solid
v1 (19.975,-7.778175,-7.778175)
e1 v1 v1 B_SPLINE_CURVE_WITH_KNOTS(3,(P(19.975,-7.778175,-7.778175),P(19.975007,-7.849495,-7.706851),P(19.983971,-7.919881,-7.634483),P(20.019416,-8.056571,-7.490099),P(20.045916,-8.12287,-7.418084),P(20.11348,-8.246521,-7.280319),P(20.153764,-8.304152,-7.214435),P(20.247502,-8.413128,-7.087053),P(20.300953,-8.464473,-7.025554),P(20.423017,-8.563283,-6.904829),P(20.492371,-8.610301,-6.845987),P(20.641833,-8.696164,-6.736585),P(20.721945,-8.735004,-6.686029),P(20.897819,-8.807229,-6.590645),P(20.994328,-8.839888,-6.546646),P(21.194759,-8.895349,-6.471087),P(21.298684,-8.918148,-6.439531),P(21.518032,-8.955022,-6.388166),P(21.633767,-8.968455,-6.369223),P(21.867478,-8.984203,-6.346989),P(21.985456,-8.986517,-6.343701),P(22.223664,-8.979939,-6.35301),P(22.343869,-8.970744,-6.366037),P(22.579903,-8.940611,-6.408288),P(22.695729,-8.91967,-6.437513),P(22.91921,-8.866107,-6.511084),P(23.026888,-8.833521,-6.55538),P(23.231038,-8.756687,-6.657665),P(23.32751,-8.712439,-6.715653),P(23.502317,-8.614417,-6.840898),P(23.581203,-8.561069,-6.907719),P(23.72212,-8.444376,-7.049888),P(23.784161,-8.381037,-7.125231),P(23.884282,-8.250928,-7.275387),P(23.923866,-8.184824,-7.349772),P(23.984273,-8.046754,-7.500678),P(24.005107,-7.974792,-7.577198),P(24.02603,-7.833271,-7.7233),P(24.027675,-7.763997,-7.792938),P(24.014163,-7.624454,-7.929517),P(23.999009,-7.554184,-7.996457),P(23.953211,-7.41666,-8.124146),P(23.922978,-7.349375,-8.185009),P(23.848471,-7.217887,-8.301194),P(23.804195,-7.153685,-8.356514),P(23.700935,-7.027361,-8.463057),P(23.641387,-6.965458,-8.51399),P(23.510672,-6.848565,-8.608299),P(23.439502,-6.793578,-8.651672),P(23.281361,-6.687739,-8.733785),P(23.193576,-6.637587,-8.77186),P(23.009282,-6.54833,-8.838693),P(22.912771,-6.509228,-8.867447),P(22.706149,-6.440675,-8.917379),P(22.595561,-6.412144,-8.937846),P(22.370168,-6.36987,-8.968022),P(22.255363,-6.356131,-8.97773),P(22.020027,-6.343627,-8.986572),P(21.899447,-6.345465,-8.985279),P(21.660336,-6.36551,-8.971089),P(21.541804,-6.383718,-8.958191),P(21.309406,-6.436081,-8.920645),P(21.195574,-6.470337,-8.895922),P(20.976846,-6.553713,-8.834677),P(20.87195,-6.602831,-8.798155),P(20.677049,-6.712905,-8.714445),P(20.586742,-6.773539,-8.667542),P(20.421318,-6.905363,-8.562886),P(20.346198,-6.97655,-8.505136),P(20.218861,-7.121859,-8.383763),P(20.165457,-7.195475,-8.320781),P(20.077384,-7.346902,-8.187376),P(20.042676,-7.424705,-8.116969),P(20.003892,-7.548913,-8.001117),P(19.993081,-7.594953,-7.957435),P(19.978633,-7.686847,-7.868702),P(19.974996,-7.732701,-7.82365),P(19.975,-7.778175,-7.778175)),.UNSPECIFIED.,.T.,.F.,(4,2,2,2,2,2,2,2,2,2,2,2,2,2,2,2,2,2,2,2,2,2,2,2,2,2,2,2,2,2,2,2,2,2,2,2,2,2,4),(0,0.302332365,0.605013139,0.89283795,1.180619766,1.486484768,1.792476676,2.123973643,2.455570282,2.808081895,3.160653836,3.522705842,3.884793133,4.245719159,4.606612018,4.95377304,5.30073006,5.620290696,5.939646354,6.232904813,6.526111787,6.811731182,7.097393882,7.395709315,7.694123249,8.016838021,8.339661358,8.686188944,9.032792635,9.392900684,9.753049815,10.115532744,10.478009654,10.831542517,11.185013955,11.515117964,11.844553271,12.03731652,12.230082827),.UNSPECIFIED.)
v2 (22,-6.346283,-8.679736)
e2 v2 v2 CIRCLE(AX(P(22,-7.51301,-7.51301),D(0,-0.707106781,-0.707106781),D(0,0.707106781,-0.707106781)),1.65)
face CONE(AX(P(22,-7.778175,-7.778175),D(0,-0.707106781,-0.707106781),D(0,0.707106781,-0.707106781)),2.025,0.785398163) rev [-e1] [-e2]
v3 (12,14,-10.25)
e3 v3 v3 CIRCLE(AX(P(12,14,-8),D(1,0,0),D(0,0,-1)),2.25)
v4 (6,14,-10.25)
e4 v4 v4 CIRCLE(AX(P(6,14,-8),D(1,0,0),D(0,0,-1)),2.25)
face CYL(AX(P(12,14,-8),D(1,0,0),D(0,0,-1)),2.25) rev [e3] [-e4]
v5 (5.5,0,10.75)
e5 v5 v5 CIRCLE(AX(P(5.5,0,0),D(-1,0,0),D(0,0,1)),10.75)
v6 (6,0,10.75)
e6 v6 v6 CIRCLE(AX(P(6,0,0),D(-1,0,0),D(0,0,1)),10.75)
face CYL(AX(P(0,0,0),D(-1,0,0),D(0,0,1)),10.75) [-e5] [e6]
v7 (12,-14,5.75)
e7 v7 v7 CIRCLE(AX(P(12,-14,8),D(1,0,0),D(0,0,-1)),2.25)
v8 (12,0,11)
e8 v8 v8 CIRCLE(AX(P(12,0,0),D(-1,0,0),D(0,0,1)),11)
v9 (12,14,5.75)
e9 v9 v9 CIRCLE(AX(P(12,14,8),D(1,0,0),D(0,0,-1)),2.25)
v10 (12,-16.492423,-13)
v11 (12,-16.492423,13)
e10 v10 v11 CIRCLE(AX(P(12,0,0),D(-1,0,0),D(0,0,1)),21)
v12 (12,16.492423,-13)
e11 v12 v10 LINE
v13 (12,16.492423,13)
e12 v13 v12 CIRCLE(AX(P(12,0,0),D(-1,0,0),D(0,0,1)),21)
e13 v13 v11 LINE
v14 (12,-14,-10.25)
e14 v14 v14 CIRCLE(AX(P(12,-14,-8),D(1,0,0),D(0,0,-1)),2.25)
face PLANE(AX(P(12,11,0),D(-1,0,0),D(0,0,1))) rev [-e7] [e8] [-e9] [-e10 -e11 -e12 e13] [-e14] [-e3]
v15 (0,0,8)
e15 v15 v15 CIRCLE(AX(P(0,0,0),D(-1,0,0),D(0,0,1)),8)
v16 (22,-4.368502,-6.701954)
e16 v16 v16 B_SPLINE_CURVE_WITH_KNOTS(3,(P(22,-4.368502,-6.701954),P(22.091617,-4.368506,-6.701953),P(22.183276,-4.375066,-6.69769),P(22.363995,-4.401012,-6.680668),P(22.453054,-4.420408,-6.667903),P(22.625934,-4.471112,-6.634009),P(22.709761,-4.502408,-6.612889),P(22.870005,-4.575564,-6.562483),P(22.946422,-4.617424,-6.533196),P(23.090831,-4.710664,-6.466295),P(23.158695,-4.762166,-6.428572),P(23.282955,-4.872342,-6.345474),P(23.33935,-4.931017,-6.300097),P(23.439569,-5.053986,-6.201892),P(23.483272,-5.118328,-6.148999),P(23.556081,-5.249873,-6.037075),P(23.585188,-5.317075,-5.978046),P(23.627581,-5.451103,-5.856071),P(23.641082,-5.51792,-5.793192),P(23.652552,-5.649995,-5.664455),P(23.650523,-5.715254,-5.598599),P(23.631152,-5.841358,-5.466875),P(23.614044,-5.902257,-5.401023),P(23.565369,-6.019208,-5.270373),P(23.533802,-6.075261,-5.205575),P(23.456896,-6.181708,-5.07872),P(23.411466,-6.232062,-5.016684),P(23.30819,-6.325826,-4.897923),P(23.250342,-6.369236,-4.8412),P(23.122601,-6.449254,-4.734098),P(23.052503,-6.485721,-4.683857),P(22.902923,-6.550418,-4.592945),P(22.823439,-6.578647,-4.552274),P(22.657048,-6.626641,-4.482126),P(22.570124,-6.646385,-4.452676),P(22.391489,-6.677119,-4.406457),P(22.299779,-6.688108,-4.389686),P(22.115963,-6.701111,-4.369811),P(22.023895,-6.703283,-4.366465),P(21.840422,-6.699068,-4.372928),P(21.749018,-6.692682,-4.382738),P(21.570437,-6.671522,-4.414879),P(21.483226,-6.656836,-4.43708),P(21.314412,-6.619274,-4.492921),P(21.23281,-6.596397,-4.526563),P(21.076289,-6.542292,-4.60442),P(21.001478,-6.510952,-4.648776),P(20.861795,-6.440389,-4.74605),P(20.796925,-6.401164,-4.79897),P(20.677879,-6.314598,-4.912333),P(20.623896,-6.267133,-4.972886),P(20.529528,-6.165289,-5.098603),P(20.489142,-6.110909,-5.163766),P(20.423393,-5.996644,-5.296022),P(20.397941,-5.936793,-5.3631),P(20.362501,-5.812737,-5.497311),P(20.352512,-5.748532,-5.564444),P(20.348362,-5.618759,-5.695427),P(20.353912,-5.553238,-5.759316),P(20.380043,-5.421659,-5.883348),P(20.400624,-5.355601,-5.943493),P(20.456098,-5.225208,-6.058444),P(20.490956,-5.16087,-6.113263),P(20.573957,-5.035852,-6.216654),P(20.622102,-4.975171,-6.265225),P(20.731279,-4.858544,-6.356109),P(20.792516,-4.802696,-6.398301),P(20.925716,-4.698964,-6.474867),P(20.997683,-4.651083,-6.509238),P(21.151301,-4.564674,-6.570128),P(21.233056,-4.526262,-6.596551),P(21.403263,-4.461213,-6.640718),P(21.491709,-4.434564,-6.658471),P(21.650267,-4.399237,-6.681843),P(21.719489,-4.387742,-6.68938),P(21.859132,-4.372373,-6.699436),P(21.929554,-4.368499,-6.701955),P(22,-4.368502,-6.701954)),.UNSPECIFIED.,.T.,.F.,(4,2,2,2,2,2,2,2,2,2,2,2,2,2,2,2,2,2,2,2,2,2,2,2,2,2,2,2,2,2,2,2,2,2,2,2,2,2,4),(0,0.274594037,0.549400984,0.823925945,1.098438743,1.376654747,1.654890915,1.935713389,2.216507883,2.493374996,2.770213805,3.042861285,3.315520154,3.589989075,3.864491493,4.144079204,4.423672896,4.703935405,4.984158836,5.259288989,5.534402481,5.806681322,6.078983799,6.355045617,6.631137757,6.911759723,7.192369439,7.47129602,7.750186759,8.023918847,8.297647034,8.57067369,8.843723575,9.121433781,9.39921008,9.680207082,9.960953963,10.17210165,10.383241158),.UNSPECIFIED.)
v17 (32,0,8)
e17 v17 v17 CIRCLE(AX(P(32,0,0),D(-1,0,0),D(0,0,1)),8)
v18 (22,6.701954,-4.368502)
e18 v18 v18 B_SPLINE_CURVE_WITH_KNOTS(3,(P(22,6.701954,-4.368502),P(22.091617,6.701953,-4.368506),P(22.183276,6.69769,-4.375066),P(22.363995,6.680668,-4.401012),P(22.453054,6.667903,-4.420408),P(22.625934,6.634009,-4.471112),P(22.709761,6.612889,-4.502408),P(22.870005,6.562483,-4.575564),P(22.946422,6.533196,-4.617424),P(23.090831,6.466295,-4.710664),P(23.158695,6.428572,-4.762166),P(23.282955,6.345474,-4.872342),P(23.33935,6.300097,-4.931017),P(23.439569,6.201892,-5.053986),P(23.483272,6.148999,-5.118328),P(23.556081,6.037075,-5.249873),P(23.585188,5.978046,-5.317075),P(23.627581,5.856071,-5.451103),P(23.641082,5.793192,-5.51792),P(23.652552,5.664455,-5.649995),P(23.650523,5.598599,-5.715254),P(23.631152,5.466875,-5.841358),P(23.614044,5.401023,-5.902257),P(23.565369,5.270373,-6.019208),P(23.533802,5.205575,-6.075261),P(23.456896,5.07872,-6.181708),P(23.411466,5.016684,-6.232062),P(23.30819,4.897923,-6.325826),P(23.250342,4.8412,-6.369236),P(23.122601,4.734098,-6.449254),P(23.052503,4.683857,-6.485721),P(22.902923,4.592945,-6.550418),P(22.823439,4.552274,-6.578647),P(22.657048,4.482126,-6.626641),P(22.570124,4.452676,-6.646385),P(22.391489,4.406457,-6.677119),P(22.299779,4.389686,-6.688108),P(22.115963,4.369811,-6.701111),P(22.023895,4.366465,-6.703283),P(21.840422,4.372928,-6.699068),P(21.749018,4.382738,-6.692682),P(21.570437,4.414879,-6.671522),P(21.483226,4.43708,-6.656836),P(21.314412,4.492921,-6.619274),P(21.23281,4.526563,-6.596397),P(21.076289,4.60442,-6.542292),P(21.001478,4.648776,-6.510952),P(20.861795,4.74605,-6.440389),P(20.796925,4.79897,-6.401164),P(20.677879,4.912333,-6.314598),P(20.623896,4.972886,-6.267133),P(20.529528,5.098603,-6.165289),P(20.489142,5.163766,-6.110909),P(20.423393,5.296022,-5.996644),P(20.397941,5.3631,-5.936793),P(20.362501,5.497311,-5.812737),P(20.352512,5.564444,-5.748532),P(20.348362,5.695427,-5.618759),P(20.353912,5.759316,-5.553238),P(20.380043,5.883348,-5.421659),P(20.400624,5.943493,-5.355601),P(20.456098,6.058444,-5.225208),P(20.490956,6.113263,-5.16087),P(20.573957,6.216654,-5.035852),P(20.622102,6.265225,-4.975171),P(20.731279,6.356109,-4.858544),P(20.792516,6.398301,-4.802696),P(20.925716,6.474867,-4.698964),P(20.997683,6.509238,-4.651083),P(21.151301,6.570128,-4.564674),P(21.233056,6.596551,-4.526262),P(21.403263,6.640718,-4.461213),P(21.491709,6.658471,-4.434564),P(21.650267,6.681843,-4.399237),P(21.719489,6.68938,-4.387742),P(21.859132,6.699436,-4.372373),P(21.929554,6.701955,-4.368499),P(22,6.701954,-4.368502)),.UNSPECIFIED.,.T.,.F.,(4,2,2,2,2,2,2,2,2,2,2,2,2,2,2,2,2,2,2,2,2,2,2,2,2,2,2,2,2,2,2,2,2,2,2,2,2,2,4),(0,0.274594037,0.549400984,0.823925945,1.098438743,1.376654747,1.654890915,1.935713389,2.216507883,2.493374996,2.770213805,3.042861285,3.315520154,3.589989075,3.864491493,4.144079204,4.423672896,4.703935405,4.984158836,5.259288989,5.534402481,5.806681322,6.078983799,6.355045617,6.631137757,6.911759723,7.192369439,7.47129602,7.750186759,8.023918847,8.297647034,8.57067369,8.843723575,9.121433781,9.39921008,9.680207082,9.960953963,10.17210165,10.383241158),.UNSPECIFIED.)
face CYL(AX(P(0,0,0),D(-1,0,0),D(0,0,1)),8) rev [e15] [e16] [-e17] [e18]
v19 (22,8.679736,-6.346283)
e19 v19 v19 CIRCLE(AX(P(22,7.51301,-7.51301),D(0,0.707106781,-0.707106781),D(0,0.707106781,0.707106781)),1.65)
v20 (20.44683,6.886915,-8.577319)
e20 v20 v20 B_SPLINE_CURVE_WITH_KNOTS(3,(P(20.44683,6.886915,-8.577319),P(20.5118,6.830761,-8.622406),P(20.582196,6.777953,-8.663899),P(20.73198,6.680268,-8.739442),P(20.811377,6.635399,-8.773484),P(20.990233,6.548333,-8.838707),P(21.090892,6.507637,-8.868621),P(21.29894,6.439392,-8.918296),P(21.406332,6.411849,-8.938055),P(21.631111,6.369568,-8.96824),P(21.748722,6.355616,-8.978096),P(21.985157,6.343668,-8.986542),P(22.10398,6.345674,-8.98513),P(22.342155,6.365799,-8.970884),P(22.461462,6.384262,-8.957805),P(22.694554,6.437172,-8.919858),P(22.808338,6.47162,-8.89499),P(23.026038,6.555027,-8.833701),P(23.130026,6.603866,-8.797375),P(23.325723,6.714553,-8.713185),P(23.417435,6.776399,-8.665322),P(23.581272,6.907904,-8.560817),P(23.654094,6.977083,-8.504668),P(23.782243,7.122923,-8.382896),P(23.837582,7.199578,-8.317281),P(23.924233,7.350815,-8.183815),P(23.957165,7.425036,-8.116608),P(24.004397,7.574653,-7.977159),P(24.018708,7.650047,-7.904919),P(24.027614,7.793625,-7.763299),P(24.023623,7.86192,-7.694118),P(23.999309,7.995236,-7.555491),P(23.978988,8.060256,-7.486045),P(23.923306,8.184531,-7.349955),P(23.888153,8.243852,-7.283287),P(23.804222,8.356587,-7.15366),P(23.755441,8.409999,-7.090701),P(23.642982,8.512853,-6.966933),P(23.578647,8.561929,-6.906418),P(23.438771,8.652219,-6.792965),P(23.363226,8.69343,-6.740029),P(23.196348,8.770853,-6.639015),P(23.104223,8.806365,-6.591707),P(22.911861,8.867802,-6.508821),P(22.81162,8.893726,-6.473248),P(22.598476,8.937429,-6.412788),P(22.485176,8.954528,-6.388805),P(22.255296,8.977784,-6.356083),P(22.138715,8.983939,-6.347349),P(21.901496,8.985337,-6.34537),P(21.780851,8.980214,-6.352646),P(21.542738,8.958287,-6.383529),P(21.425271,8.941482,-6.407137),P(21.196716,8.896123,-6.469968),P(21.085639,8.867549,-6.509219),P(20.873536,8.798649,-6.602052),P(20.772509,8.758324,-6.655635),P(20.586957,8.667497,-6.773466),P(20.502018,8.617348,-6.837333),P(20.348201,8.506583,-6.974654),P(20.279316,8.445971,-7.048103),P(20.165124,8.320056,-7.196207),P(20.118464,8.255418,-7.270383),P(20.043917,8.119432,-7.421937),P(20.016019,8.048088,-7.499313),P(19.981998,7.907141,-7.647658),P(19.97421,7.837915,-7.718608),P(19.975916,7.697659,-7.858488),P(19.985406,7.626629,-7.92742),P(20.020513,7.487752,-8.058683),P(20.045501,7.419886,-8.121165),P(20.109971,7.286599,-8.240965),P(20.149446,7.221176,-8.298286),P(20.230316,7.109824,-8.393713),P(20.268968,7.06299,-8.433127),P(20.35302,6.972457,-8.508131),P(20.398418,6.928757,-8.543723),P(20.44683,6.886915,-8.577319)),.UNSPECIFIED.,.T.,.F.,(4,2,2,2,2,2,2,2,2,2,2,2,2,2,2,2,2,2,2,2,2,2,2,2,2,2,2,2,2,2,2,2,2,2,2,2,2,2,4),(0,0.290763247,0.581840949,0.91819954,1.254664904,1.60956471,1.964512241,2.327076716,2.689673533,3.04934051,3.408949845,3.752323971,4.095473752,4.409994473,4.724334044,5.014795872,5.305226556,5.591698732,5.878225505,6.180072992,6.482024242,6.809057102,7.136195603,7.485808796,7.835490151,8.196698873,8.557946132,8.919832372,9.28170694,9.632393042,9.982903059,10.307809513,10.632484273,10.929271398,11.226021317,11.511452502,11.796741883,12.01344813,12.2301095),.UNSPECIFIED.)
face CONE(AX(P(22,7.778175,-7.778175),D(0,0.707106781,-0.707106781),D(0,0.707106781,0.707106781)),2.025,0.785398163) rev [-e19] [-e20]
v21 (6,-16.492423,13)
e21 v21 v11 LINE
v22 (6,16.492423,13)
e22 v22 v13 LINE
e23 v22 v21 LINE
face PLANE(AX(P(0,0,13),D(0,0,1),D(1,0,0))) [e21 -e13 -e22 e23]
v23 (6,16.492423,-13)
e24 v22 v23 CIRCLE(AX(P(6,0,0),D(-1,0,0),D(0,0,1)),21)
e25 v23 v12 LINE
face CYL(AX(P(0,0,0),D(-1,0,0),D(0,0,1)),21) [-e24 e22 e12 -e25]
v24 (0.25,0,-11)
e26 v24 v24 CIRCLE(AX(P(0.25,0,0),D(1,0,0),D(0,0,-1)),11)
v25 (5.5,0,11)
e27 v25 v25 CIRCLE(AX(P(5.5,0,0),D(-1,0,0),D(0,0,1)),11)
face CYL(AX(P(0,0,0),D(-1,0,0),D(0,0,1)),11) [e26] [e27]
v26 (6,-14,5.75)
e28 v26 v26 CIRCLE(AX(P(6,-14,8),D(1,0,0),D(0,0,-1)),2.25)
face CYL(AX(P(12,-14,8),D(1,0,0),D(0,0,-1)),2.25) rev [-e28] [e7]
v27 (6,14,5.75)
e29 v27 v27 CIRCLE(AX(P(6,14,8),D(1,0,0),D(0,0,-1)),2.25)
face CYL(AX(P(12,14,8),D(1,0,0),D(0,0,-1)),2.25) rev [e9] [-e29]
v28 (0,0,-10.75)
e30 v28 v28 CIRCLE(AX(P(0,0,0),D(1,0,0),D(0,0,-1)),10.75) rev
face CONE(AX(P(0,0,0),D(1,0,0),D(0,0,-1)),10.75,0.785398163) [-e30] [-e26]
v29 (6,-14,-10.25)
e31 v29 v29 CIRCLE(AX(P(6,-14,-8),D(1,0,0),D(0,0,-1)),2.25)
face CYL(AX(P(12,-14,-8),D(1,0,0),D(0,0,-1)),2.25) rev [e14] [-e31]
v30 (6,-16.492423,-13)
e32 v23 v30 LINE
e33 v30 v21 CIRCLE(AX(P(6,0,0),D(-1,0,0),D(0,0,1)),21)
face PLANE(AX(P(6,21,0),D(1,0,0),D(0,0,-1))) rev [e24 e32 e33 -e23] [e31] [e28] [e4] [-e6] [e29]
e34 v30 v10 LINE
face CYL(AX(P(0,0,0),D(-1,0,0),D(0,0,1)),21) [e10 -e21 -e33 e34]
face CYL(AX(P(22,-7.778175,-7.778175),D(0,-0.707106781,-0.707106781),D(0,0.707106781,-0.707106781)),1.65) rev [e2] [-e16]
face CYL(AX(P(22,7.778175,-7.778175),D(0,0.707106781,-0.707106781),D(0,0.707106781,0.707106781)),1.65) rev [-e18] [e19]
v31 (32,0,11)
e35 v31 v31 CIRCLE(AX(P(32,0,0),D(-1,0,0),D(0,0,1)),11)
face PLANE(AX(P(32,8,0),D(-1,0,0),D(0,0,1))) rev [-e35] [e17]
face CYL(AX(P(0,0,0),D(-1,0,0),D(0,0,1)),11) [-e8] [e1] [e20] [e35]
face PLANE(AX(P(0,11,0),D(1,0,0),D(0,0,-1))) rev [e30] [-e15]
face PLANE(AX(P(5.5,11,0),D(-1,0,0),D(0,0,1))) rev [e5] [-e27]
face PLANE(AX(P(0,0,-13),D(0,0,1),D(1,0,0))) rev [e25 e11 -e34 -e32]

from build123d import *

# Parameters (mm, degrees)
CUT_EXTRUDE_1_DEPTH = 36.80502758
CHAMFER_1_SIZE      = 0.25
HOLE_WIZARD_1_D     = 4.5


# Read off the part's stored shape, not the designer's step: M4 螺纹孔1
with BuildPart() as part:
    # 草图2 → 旋转1 (revolve)
    with BuildSketch(Plane.XY, mode=Mode.PRIVATE) as revolve_1_sk:
        Polygon((32, 8), (32, 11), (12, 11), (12, 21), (6, 21), (6, 10.75), (5.5, 10.75), (5.5, 11), (0, 11), (0, 8), align=None)
    revolve(revolve_1_sk.sketch.rotate(Axis((0, 0, 0), (1, 0, 0)), 90), axis=Axis((0, 0, 0), (1, 0, 0)))

    # 草图3 → 切除-拉伸1 (cut, through all)
    with BuildSketch(Plane(origin=(12, 0, 0), x_dir=(0, 0, -1), z_dir=(1, 0, 0))):
        with BuildLine():
            Line((-13, -16.492422502), (-13, 16.492422502))
            ThreePointArc((-13, 16.492422502), (-21, 0), (-13, -16.492422502))
        make_face()
        with BuildLine():
            ThreePointArc((21, 0), (18.894443628, 9.16515139), (13, 16.492422502))
            Line((13, 16.492422502), (13, -16.492422502))
            ThreePointArc((13, -16.492422502), (18.894443628, -9.16515139), (21, 0))
        make_face()
    extrude(amount=-CUT_EXTRUDE_1_DEPTH, mode=Mode.SUBTRACT)

    # 倒角1
    chamfer_1_edges = [part.edges().sort_by_distance(p)[0] for p in [
        (0, 0, -11),
    ]]
    chamfer(chamfer_1_edges, length=CHAMFER_1_SIZE)

    # 孔1 (through all)
    with Locations(Plane(origin=(12, 0, 0), x_dir=(0, 0, -1), z_dir=(1, 0, 0))):
        with Locations((-8, 14), (-8, -14), (8, 14), (8, -14)):
            Hole(HOLE_WIZARD_1_D / 2)

    # M4 螺纹孔1 outline → M4 螺纹孔1 (revolve, cut)
    with BuildSketch(Plane(origin=(22, 0, 0), x_dir=(1, 0, 0), z_dir=(0, 0.707106781186546, 0.707106781186549))):
        Polygon((2.025041593, 11.000041593), (0, 11.000041593), (0, 7.827899387), (1.65, 7.827899387), (1.65, 10.625), align=None)
    revolve(axis=Axis((22, 0, 0), (0, 0.707106781186549, -0.707106781186546)), mode=Mode.SUBTRACT)

    # Hole Wizard M4 _1 2 outline → Hole Wizard M4 _1 2 (revolve, cut)
    with BuildSketch(Plane(origin=(22, 0, 0), x_dir=(1, 0, 0), z_dir=(0, -0.707106781186546, 0.707106781186549))):
        Polygon((0, -11.000091928), (2.025091928, -11.000091928), (1.65, -10.625), (1.65, -7.827899387), (0, -7.827899387), align=None)
    revolve(axis=Axis((22, 0, 0), (0, 0.707106781186549, 0.707106781186546)), mode=Mode.SUBTRACT)


solid = part.part
